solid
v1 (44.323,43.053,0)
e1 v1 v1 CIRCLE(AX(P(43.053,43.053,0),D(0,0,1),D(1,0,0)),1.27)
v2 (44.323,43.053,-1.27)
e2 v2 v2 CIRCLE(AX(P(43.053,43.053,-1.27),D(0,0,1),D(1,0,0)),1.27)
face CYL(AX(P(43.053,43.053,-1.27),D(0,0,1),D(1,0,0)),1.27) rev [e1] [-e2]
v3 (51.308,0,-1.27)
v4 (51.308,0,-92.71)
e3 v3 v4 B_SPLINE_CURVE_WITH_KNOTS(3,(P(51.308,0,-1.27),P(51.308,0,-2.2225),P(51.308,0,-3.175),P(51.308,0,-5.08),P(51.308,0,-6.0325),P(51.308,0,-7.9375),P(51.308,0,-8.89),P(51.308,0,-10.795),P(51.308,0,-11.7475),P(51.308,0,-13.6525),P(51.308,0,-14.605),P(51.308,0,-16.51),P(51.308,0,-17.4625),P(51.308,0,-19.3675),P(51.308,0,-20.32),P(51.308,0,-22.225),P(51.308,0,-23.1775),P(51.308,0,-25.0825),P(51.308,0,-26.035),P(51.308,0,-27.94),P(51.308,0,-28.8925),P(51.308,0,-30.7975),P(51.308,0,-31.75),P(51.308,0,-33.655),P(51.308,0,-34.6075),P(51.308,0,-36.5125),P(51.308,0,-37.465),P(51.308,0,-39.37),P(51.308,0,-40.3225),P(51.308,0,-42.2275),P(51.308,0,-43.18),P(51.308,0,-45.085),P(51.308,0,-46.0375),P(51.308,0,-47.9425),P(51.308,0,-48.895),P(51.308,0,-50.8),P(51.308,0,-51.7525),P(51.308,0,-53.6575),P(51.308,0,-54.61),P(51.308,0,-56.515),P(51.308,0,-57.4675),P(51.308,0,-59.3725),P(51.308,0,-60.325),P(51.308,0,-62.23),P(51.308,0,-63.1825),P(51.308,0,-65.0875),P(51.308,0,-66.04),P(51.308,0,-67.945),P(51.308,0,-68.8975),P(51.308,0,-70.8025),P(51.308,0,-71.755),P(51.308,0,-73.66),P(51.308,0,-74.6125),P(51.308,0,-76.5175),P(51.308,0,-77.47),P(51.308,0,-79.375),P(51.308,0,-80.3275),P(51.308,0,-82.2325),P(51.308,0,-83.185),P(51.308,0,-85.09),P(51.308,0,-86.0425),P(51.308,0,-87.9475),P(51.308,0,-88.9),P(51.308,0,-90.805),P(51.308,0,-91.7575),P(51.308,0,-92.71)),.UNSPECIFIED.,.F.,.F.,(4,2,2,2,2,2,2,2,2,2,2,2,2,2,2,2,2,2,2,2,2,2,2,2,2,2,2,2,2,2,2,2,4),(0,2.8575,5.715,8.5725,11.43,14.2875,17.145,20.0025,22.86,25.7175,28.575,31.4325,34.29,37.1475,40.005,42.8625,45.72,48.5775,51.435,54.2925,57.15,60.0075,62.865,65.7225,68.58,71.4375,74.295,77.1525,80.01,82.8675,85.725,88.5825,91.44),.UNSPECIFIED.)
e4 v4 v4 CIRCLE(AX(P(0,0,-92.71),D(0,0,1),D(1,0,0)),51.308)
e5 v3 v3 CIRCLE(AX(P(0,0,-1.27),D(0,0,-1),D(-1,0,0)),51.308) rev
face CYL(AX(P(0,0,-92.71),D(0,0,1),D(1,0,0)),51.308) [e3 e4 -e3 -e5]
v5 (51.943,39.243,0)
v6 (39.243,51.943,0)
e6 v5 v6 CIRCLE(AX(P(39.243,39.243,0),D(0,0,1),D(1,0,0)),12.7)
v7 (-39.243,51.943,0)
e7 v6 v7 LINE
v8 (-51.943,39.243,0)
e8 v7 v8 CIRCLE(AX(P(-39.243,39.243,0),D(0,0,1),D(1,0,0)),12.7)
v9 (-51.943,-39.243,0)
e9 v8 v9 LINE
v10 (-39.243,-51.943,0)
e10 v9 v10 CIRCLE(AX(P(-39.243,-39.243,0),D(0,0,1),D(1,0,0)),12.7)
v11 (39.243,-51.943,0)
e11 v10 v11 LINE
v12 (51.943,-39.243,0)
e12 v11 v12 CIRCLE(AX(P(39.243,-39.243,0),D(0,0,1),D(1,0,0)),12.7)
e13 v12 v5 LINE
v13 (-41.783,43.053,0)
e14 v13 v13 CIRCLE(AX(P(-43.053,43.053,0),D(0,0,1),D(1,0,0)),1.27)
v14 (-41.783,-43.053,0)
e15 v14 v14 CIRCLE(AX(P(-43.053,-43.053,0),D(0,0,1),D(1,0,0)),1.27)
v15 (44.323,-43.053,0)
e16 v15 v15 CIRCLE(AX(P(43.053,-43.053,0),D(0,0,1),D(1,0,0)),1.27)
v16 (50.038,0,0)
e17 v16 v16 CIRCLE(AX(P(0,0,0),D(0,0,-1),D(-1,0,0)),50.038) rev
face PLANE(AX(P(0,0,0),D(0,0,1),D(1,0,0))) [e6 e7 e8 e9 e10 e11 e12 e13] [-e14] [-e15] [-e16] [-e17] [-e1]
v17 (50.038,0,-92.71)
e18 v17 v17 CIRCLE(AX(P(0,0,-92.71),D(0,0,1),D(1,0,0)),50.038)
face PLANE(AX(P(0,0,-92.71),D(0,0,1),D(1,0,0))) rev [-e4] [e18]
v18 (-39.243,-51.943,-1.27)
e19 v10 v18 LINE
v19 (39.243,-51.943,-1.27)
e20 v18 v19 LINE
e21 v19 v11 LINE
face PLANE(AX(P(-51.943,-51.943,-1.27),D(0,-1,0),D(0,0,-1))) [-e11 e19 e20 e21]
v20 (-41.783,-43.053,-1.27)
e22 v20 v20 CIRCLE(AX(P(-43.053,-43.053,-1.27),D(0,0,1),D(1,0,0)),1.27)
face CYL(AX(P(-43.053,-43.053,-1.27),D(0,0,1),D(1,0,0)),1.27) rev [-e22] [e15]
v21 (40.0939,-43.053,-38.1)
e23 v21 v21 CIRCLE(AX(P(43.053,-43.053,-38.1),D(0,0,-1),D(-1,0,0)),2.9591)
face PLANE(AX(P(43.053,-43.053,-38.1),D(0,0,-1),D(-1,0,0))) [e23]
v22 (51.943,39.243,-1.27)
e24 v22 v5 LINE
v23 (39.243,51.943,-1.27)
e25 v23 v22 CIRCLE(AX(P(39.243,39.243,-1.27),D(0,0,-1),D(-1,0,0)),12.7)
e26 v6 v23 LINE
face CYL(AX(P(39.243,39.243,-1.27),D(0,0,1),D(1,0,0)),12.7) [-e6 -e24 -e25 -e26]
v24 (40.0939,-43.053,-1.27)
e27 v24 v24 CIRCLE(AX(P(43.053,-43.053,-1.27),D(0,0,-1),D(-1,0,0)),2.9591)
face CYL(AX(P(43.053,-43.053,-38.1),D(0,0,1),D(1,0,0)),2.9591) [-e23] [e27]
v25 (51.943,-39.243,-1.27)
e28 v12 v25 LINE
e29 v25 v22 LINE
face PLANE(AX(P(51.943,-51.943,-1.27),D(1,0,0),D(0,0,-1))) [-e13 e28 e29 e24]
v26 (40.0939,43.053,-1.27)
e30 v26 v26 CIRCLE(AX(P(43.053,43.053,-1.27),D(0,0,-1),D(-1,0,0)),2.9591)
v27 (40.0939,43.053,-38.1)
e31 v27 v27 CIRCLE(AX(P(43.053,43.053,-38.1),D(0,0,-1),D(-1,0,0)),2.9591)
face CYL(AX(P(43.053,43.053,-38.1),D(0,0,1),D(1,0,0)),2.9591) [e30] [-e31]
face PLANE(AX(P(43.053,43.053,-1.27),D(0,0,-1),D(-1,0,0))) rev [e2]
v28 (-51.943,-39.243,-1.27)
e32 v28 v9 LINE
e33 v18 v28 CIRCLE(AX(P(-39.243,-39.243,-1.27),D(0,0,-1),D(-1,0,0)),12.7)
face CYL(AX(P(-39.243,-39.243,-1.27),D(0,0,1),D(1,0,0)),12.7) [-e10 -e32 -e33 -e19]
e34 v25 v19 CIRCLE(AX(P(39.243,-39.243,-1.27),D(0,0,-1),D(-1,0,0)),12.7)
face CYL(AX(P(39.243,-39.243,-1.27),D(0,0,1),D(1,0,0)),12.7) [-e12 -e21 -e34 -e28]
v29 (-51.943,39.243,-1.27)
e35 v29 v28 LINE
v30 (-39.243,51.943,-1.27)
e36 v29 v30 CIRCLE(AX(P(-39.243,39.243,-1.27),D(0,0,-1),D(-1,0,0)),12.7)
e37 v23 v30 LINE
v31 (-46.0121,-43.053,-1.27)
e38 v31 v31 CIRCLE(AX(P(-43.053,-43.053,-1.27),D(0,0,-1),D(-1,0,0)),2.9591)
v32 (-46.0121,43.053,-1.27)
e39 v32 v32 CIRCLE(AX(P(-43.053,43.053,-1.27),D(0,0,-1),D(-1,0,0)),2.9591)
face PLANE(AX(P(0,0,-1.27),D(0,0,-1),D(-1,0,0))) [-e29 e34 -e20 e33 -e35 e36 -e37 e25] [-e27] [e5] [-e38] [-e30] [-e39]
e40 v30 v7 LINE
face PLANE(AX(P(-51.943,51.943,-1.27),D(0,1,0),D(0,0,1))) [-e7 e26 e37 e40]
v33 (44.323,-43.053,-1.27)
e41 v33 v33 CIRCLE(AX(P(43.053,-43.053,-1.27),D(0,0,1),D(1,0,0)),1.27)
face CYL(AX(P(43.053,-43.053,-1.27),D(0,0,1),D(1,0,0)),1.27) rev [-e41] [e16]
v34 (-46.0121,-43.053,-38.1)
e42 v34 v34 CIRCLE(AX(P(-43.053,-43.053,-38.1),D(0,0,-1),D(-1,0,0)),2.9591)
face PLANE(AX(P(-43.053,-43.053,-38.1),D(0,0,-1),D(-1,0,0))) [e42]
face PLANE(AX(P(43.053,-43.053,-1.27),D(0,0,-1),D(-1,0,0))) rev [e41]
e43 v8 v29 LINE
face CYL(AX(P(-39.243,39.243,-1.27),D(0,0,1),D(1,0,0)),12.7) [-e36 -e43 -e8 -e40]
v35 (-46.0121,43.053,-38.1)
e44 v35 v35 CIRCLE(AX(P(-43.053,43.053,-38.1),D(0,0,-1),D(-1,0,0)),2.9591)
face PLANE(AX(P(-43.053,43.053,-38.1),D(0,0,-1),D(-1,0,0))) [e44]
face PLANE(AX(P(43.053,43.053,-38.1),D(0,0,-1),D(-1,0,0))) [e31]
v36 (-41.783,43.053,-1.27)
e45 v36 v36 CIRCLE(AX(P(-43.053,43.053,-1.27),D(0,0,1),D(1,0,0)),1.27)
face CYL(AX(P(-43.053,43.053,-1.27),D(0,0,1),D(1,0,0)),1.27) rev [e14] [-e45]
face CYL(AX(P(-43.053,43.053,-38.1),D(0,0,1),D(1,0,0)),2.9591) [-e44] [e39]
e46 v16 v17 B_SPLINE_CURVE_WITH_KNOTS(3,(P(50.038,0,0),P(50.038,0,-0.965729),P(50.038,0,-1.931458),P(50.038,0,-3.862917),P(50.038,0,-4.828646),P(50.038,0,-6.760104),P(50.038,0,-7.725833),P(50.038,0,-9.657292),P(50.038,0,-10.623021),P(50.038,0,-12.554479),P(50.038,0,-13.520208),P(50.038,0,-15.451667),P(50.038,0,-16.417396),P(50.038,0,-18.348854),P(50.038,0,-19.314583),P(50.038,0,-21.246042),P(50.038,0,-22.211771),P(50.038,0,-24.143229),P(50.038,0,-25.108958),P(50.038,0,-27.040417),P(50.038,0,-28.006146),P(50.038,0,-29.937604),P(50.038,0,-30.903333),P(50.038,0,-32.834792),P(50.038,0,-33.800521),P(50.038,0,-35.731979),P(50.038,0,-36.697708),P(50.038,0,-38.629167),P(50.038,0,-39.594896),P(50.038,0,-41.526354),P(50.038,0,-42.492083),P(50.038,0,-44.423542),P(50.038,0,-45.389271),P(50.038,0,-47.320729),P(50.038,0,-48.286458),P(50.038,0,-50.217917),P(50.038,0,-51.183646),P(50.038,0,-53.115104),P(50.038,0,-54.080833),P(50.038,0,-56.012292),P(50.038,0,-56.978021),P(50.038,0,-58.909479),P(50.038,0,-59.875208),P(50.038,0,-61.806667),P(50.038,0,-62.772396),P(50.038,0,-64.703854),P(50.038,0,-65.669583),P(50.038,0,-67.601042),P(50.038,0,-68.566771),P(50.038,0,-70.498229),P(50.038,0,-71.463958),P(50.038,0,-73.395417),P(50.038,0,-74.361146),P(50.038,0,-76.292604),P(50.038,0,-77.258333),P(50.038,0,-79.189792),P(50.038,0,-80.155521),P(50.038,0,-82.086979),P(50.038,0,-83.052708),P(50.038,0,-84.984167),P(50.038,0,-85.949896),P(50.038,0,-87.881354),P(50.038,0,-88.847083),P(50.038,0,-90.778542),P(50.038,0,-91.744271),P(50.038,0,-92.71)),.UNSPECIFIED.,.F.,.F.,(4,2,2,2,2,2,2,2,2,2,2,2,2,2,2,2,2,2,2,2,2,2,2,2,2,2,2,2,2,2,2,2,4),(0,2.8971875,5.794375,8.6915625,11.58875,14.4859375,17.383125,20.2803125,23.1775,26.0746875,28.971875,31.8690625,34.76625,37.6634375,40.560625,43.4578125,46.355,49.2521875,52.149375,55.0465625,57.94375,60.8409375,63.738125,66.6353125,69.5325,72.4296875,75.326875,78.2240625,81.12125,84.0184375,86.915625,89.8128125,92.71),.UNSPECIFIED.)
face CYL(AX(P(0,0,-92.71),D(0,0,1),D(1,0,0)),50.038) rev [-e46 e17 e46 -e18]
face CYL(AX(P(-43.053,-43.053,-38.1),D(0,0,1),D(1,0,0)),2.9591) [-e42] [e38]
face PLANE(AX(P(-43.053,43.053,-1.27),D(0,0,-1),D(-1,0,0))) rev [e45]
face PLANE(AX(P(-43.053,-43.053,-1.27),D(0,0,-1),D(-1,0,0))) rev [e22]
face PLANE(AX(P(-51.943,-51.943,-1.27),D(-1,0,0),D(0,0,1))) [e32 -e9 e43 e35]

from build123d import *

# Parameters (mm, degrees)
SKETCH1_R           = 51.308
BOSS_EXTRUDE1_DEPTH = 92.71
SKETCH2_W           = 103.886
SKETCH2_H           = 103.886
SKETCH2_R           = 1.27
BOSS_EXTRUDE2_DEPTH = 1.27
SHELL1_START        = -92.71
SHELL1_OUTLINE_R    = 50.038
SHELL1_DEPTH        = 92.71
FILLET1_R           = 12.7
SKETCH3_R           = 2.9591
BOSS_EXTRUDE3_DEPTH = 36.83


# Read off the part's stored shape, not the designer's step: Shell1
with BuildPart() as part:
    # Sketch1 → Boss-Extrude1 (new body)
    with BuildSketch(Plane.XY):
        Circle(SKETCH1_R)
    extrude(amount=-BOSS_EXTRUDE1_DEPTH)

    # Sketch2 → Boss-Extrude2 (add)
    with BuildSketch(Plane.XY):
        Rectangle(SKETCH2_W, SKETCH2_H)
        with Locations((43.053, 43.053)):
            Circle(SKETCH2_R, mode=Mode.SUBTRACT)
        with Locations((-43.053, 43.053)):
            Circle(SKETCH2_R, mode=Mode.SUBTRACT)
        with Locations((43.053, -43.053)):
            Circle(SKETCH2_R, mode=Mode.SUBTRACT)
        with Locations((-43.053, -43.053)):
            Circle(SKETCH2_R, mode=Mode.SUBTRACT)
    extrude(amount=-BOSS_EXTRUDE2_DEPTH)

    # Shell1 outline → Shell1 (cut)
    with BuildSketch(Plane.XY.offset(SHELL1_START)):
        Circle(SHELL1_OUTLINE_R)
    extrude(amount=SHELL1_DEPTH, mode=Mode.SUBTRACT)

    # Fillet1
    fillet1_edges = [part.edges().sort_by_distance(p)[0] for p in [
        (51.943, 51.943, -0.635),
        (51.943, -51.943, -0.635),
        (-51.943, -51.943, -0.635),
        (-51.943, 51.943, -0.635),
    ]]
    fillet(fillet1_edges, radius=FILLET1_R)

    # Sketch3 → Boss-Extrude3 (add)
    with BuildSketch(Plane(origin=(0, 0, -1.27), x_dir=(-1, 0, 0), z_dir=(0, 0, -1))):
        with Locations((-43.053, 43.053)):
            Circle(SKETCH3_R)
        with Locations((43.053, 43.053)):
            Circle(SKETCH3_R)
        with Locations((43.053, -43.053)):
            Circle(SKETCH3_R)
        with Locations((-43.053, -43.053)):
            Circle(SKETCH3_R)
    extrude(amount=BOSS_EXTRUDE3_DEPTH)


solid = part.part
